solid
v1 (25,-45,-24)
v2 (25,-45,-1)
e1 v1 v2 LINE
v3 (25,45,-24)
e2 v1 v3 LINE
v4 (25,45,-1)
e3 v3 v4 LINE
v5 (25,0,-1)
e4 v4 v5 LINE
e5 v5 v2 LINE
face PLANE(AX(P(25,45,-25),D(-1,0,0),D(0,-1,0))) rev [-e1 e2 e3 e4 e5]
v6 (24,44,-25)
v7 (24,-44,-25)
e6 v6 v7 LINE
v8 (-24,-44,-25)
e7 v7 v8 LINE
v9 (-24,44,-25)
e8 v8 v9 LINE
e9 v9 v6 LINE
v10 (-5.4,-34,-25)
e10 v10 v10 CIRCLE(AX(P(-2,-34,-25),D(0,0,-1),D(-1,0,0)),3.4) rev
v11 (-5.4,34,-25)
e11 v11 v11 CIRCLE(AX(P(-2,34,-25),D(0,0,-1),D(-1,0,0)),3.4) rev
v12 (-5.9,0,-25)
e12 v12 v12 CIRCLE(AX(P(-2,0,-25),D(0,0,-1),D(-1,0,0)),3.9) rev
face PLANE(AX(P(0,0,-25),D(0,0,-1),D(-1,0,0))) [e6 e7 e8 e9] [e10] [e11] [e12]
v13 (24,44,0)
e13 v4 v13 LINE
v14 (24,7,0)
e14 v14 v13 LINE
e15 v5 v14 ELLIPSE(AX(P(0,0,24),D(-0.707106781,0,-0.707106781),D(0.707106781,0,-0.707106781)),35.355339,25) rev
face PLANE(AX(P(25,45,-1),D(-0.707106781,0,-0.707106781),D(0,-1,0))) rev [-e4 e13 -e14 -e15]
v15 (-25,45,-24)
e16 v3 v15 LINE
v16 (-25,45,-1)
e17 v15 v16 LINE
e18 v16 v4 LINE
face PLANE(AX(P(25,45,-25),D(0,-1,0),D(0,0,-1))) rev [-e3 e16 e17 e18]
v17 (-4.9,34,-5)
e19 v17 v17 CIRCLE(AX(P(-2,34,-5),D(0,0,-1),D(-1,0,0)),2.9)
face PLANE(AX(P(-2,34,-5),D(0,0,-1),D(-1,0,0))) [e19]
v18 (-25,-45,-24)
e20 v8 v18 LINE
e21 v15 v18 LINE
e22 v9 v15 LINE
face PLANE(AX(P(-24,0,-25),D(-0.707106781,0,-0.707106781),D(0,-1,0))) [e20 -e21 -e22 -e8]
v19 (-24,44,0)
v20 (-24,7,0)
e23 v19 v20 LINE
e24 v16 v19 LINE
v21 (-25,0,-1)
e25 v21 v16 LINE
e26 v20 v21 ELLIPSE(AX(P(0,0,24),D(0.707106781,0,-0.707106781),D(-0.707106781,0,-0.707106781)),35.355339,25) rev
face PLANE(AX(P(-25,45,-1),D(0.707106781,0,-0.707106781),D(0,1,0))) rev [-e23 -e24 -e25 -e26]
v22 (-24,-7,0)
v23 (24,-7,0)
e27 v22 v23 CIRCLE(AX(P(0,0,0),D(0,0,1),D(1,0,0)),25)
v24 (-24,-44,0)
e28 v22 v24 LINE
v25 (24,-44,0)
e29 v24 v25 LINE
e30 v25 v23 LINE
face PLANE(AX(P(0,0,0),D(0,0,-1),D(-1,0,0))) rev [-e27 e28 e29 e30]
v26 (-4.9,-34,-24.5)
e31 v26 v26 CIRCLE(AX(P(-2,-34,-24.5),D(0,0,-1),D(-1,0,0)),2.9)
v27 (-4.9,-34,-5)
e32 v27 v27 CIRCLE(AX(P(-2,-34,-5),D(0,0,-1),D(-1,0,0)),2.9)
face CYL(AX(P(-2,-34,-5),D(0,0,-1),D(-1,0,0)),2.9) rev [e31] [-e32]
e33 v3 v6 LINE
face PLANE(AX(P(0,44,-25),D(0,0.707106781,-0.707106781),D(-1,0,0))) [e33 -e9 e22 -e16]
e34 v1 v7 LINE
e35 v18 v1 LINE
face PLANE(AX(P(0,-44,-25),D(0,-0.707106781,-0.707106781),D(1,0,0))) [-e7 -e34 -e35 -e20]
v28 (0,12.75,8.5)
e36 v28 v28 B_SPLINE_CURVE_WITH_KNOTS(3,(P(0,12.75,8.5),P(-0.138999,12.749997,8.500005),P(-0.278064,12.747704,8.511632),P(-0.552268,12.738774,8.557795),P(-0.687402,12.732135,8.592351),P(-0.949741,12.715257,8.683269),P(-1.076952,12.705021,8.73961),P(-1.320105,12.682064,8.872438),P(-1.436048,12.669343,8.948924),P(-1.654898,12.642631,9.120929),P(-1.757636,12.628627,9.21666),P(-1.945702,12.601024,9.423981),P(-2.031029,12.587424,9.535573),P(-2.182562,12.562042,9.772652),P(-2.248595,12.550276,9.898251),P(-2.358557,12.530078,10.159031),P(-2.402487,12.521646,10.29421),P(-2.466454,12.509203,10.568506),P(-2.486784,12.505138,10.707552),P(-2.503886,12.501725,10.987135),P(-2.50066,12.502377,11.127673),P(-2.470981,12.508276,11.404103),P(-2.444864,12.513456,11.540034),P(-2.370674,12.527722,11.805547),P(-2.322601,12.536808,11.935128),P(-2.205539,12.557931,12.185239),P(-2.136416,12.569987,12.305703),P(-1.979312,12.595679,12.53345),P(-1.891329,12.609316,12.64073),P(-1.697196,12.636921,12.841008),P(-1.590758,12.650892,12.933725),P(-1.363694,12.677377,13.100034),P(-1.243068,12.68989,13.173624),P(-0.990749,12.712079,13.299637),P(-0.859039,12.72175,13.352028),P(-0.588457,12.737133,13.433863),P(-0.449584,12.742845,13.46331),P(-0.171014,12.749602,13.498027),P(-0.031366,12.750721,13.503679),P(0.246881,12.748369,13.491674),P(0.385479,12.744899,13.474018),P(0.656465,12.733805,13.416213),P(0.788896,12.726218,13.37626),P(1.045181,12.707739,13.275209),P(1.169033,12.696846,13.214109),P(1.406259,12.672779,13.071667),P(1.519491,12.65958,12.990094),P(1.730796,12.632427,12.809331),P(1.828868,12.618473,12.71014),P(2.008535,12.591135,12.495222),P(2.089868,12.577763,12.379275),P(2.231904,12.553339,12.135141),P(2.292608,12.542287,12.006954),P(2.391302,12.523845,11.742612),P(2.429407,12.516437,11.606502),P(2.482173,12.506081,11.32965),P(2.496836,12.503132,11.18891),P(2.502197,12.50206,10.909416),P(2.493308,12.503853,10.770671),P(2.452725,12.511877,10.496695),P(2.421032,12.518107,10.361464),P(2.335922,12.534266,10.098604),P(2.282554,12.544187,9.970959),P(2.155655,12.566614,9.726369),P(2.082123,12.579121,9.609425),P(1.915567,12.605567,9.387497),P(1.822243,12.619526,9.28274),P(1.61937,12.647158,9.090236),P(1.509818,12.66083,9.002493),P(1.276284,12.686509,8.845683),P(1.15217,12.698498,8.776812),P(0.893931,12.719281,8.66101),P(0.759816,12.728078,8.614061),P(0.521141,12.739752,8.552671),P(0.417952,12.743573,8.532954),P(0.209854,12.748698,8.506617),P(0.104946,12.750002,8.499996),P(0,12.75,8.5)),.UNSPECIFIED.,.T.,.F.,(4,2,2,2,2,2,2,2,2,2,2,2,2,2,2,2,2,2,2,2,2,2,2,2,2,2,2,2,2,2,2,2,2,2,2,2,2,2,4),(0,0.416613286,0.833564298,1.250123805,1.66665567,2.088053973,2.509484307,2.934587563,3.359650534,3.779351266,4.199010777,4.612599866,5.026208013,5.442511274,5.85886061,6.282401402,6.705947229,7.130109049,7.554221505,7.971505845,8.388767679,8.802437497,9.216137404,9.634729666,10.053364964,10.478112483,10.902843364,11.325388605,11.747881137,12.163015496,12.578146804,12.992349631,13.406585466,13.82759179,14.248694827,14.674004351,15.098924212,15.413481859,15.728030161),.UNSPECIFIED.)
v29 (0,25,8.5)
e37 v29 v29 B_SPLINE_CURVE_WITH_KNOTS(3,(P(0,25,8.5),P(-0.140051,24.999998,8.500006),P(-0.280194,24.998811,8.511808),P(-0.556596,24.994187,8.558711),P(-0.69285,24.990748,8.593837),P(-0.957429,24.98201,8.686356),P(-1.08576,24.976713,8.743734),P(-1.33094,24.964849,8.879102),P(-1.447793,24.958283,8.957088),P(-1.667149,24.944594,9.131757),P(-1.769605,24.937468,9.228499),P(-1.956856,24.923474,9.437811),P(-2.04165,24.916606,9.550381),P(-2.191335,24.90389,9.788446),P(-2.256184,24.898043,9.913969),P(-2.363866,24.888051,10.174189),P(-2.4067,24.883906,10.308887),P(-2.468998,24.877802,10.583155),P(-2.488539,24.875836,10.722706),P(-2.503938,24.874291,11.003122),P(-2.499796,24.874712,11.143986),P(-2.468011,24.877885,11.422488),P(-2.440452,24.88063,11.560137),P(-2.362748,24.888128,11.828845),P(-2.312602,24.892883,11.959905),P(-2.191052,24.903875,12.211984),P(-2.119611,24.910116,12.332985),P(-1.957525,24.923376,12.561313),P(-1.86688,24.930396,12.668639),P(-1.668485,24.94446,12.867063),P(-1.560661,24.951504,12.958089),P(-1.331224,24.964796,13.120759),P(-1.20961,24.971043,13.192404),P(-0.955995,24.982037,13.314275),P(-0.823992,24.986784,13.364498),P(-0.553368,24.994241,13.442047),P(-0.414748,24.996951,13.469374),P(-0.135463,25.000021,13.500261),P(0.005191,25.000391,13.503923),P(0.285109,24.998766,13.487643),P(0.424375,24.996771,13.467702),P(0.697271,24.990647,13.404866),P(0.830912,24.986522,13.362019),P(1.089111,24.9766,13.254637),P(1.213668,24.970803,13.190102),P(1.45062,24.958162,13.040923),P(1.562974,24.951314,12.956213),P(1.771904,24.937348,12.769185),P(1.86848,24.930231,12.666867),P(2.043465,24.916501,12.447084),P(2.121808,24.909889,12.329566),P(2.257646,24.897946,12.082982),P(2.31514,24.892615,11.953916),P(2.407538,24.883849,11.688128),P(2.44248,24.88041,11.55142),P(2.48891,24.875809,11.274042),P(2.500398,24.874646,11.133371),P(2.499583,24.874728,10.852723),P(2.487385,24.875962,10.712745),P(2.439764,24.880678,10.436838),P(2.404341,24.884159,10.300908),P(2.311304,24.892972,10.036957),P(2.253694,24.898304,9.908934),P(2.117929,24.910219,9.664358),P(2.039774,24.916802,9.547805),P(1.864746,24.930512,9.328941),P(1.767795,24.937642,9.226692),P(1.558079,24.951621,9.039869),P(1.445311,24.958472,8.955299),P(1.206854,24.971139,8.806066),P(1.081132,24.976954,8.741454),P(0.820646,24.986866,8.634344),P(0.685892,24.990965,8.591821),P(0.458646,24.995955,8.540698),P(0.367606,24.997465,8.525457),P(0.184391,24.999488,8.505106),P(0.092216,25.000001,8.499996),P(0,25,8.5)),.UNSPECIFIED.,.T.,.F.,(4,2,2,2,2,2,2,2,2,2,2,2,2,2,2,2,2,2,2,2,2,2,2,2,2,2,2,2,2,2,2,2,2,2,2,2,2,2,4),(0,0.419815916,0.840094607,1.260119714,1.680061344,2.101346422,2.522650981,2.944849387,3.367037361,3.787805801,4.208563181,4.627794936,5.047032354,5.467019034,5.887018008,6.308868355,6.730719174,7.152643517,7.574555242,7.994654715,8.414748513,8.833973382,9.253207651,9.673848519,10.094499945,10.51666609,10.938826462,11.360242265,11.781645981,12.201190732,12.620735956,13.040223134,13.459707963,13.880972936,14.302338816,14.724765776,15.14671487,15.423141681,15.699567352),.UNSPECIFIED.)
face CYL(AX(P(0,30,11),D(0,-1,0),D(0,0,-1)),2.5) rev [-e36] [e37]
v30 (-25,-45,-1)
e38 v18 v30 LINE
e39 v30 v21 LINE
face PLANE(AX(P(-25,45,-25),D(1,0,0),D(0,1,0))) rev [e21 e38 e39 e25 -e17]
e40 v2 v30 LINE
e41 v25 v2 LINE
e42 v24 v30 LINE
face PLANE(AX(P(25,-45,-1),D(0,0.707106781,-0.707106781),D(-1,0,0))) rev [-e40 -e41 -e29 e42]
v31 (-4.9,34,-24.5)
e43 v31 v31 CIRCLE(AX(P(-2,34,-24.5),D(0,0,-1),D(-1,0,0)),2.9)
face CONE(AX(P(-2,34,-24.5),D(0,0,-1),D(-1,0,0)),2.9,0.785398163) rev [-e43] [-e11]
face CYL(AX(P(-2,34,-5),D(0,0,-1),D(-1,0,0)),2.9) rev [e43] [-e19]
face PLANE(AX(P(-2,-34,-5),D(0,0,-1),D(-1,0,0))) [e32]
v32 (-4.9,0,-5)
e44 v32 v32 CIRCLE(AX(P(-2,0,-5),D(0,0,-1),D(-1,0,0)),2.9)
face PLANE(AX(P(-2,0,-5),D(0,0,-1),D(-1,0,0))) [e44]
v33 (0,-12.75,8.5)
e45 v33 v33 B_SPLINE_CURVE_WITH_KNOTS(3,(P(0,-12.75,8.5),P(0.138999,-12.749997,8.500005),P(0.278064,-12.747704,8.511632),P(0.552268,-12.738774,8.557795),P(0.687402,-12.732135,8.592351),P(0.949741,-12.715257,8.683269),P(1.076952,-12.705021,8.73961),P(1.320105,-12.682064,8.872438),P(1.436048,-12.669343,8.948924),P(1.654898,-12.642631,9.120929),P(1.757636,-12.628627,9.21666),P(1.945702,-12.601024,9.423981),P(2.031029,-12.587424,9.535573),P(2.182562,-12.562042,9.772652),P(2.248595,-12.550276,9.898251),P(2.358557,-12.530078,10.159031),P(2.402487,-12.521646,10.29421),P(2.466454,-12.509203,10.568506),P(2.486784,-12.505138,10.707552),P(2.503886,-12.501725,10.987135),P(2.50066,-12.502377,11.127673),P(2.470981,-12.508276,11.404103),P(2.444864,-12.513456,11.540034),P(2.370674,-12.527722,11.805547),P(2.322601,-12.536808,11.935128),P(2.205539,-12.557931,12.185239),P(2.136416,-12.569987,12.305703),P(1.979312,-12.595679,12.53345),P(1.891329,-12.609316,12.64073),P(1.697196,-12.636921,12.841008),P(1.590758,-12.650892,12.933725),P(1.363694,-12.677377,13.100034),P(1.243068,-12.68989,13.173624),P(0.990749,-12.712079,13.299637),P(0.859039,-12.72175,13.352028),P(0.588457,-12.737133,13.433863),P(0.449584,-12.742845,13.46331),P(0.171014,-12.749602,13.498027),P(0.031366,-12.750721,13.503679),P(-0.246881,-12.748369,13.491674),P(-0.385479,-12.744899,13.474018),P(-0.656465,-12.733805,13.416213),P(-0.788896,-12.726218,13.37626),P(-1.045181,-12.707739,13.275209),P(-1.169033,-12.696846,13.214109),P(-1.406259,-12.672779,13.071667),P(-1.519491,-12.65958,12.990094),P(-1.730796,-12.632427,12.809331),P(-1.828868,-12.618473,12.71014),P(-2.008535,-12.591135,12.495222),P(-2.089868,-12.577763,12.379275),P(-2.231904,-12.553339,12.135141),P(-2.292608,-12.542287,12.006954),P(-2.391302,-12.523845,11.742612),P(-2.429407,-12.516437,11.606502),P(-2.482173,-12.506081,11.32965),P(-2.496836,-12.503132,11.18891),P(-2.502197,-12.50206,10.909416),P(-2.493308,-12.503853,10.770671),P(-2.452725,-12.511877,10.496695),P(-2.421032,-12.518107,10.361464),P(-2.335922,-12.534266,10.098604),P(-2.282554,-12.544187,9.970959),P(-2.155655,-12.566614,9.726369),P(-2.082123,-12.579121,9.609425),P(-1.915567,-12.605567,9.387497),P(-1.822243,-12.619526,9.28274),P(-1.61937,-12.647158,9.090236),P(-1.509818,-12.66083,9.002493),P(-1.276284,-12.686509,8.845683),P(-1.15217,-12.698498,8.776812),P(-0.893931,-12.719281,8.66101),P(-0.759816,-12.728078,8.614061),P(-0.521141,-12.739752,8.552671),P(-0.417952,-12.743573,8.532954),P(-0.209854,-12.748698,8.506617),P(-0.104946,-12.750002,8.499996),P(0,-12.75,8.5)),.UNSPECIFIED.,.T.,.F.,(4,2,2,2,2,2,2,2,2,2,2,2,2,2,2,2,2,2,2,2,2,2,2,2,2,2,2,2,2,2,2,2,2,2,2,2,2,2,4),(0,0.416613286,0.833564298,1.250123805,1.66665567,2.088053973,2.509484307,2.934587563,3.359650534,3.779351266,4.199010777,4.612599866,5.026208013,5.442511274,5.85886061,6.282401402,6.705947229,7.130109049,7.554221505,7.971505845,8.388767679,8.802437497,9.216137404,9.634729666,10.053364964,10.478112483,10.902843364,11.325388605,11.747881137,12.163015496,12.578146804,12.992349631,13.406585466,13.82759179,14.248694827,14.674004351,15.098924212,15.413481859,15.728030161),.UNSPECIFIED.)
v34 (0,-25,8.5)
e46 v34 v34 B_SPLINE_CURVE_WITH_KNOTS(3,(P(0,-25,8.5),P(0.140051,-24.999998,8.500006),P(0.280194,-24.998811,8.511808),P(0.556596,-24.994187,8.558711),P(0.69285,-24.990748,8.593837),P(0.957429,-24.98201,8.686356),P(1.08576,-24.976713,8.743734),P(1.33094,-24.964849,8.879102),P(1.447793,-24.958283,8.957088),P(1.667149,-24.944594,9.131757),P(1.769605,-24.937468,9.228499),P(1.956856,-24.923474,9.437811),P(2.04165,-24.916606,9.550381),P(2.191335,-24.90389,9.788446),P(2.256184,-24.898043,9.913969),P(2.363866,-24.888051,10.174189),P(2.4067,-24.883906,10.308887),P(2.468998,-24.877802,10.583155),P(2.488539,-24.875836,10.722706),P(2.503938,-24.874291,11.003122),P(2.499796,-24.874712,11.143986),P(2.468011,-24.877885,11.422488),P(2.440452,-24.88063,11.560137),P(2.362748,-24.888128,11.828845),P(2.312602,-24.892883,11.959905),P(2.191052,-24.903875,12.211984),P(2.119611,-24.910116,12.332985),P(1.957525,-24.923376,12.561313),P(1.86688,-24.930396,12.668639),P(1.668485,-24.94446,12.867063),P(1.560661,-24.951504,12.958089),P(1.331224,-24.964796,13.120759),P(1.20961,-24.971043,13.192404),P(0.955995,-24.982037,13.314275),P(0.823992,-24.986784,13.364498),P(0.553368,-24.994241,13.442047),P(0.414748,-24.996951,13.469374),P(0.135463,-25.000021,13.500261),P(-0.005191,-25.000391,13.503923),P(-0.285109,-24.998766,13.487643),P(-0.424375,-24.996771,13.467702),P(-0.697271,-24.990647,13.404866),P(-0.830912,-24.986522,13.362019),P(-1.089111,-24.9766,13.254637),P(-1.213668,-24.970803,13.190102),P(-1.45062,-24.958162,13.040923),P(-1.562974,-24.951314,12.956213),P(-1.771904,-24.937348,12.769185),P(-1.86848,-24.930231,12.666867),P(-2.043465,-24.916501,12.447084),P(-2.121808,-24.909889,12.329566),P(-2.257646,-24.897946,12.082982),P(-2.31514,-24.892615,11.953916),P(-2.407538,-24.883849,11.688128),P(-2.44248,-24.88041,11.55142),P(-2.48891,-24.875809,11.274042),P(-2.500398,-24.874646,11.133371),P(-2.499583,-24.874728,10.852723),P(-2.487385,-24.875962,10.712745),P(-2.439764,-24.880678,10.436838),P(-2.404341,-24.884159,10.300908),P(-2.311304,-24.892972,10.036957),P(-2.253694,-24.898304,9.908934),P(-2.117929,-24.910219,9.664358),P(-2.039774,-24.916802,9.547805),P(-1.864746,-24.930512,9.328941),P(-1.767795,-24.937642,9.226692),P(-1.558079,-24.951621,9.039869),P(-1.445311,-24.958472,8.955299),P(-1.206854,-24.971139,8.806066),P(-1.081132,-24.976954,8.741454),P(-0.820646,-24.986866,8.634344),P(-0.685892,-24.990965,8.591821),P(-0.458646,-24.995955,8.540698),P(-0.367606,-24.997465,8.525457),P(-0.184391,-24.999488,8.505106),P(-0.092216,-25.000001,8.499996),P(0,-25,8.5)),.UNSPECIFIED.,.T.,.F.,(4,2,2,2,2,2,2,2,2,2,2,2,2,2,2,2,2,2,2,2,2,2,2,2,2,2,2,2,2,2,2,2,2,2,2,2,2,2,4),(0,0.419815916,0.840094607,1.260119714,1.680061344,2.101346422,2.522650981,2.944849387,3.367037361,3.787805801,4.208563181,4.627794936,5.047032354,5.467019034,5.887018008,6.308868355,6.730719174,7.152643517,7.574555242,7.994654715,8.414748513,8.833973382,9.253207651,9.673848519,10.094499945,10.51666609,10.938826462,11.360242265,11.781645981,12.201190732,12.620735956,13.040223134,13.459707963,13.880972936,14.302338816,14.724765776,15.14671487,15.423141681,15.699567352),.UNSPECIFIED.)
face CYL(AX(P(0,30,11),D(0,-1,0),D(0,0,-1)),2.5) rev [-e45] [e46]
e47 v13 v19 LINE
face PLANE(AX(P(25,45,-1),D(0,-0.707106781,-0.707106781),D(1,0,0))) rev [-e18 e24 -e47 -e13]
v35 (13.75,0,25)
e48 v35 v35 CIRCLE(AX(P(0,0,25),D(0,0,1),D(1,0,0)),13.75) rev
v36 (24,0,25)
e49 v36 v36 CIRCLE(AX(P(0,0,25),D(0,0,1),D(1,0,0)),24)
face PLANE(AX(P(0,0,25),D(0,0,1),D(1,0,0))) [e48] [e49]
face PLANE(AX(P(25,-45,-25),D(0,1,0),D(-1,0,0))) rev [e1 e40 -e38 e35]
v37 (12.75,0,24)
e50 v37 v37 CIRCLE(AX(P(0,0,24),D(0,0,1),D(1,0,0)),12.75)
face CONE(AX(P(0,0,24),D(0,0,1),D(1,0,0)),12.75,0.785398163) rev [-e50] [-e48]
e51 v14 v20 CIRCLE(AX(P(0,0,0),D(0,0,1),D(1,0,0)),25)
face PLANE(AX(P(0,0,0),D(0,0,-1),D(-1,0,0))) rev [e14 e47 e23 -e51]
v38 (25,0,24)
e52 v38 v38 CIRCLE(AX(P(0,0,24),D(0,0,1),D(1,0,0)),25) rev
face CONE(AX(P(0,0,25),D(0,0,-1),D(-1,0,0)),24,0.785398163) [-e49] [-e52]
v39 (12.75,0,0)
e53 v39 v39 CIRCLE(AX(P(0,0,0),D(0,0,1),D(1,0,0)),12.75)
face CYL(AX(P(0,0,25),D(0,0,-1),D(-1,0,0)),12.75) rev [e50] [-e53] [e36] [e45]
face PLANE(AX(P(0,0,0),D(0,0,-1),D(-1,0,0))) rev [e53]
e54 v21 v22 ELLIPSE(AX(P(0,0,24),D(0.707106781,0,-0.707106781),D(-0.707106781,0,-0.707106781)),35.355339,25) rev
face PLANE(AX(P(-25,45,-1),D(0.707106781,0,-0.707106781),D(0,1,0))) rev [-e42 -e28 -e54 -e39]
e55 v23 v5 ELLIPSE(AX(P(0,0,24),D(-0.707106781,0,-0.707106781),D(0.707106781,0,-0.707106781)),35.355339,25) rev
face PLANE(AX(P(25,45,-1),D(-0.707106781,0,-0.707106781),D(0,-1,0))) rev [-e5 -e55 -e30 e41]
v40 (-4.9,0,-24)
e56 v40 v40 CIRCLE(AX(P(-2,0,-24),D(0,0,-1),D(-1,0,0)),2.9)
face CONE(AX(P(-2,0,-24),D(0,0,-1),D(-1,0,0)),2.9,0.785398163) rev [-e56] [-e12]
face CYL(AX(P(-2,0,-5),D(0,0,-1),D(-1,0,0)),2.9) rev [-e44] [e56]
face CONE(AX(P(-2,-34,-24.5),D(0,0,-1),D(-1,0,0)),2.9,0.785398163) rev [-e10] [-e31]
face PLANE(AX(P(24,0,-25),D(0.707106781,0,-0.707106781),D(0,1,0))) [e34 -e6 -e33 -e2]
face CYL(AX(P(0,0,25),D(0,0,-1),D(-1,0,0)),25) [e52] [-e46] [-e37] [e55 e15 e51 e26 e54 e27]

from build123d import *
from build123d.topology import SkipClean

# Parameters (mm, degrees)
SKETCH_1_R               = 25
SKETCH_1_R_2             = 12.75
EXTRUDE_1_DEPTH          = 25
CUT_EXTRUDE_1_DEPTH      = 30
CUT_EXTRUDE_1_DEPTH_BACK = 30
SKETCH_2_R               = 2.5
SKETCH_3_W               = 50
SKETCH_3_H               = 90
EXTRUDE_2_DEPTH          = 25
CHAMFER_1_SIZE           = 1
SKETCH_4_R               = 2.9
CUT_EXTRUDE_2_DEPTH      = 20
CHAMFER_2_SIZE           = 1
SKETCH_5_R               = 2.9
CUT_EXTRUDE_3_DEPTH      = 20
CHAMFER_3_SIZE           = 0.5


with BuildPart() as part:
    # 草图1 → 凸台-拉伸1 (new body)
    with BuildSketch(Plane.XY):
        Circle(SKETCH_1_R)
        Circle(SKETCH_1_R_2, mode=Mode.SUBTRACT)
    extrude(amount=EXTRUDE_1_DEPTH)

    # 草图2 → 切除-拉伸1 (cut, two sides: drawn at the far end of the back side and taken through both)
    with BuildSketch(Plane(origin=(0, 0, 0), x_dir=(1, 0, 0), z_dir=(0, 1, 0)).offset(-CUT_EXTRUDE_1_DEPTH_BACK)):
        with Locations(Location((0, -11, 0), (0, 0, 90))):
            Circle(SKETCH_2_R)
    extrude(amount=CUT_EXTRUDE_1_DEPTH + CUT_EXTRUDE_1_DEPTH_BACK, mode=Mode.SUBTRACT)

    # 草图3 → 凸台-拉伸2 (add)
    with BuildSketch(Plane(origin=(0, 0, 0), x_dir=(-1, 0, 0), z_dir=(0, 0, -1))):
        Rectangle(SKETCH_3_W, SKETCH_3_H)
    extrude(amount=EXTRUDE_2_DEPTH)

    # 倒角1
    chamfer_1_edges = [part.edges().sort_by_distance(p)[0] for p in [
        (-25, 0, 25),
        (-12.75, 0, 25),
    ]]
    chamfer(chamfer_1_edges, length=CHAMFER_1_SIZE)

    # 草图4 → 切除-拉伸2 (cut)
    with BuildSketch(Plane(origin=(0, 0, -25), x_dir=(-1, 0, 0), z_dir=(0, 0, -1))):
        with Locations((2, 0)):
            Circle(SKETCH_4_R)
    extrude(amount=-CUT_EXTRUDE_2_DEPTH, mode=Mode.SUBTRACT)

    # 倒角2
    # the kernel refuses this chamfer: 1 mm, written as the material it takes off along each edge
    with BuildSketch(Plane(origin=(25, 0, 0), x_dir=(-0.9996219169112968, 0, 0.02749587661058639), z_dir=(0, 1, 0))) as chamfer_2_piece_1_section:
        Polygon((CHAMFER_2_SIZE * 0.999621916911, -CHAMFER_2_SIZE * 0.0274958766106), (-CHAMFER_2_SIZE * 0.0274958766106, -CHAMFER_2_SIZE * 0.999621916911), (0, 0), align=None)
    chamfer_2_piece_1 = extrude(amount=47.571682988, mode=Mode.PRIVATE)
    chamfer_2_piece_1 = chamfer_2_piece_1 - Plane(origin=(0, 0, -0.337643677), x_dir=(1, 0, 0), z_dir=(0, 0, -1)) * Cylinder(25, 100, mode=Mode.PRIVATE)
    add(chamfer_2_piece_1, mode=Mode.SUBTRACT)
    with BuildSketch(Plane(origin=(25, -47.571682988, 0), x_dir=(-0.9996219169112968, 0, 0.02749587661058639), z_dir=(0, 1, 0))) as chamfer_2_piece_2_section:
        Polygon((CHAMFER_2_SIZE * 0.999621916911, -CHAMFER_2_SIZE * 0.0274958766106), (-CHAMFER_2_SIZE * 0.0274958766106, -CHAMFER_2_SIZE * 0.999621916911), (0, 0), align=None)
    chamfer_2_piece_2 = extrude(amount=47.571682988, mode=Mode.PRIVATE)
    chamfer_2_piece_2 = chamfer_2_piece_2 - Plane(origin=(0, 0, -0.337643676), x_dir=(1, 0, 0), z_dir=(0, 0, -1)) * Cylinder(25, 100, mode=Mode.PRIVATE)
    add(chamfer_2_piece_2, mode=Mode.SUBTRACT)
    with BuildSketch(Plane(origin=(-27.571682988, -45, 0), x_dir=(0, 0.9996219169112968, 0.027495876610586292), z_dir=(1, 0, 0)), Plane(origin=(27.571682988, 45, 0), x_dir=(0, -0.9996219169112968, 0.027495876610586292), z_dir=(-1, 0, 0)), Plane(origin=(-27.571682988, -45, -25), x_dir=(0, -0.0274958766105891, 0.9996219169112968), z_dir=(1, 0, 0)), Plane(origin=(27.571682988, 45, -25), x_dir=(0, 0.0274958766105891, 0.9996219169112968), z_dir=(-1, 0, 0))) as chamfer_2_piece_3:
        Polygon((CHAMFER_2_SIZE * 0.999621916911, -CHAMFER_2_SIZE * 0.0274958766106), (-CHAMFER_2_SIZE * 0.0274958766106, -CHAMFER_2_SIZE * 0.999621916911), (0, 0), align=None)
    extrude(amount=55.143365976, mode=Mode.SUBTRACT)
    with BuildSketch(Plane(origin=(-25, -1.3e-08, 0), x_dir=(0.9996219169112968, 0, 0.02749587661058639), z_dir=(0, -1, 0))) as chamfer_2_piece_4_section:
        Polygon((CHAMFER_2_SIZE * 0.999621916911, -CHAMFER_2_SIZE * 0.0274958766106), (-CHAMFER_2_SIZE * 0.0274958766106, -CHAMFER_2_SIZE * 0.999621916911), (0, 0), align=None)
    chamfer_2_piece_4 = extrude(amount=47.571682975, mode=Mode.PRIVATE)
    chamfer_2_piece_4 = chamfer_2_piece_4 - Plane(origin=(0, 0, -0.337643677), x_dir=(1, 0, 0), z_dir=(0, 0, -1)) * Cylinder(25, 100, mode=Mode.PRIVATE)
    add(chamfer_2_piece_4, mode=Mode.SUBTRACT)
    with BuildSketch(Plane(origin=(-25, 47.571682988, 0), x_dir=(0.9996219169112968, 0, 0.02749587661058639), z_dir=(0, -1, 0))) as chamfer_2_piece_5_section:
        Polygon((CHAMFER_2_SIZE * 0.999621916911, -CHAMFER_2_SIZE * 0.0274958766106), (-CHAMFER_2_SIZE * 0.0274958766106, -CHAMFER_2_SIZE * 0.999621916911), (0, 0), align=None)
    chamfer_2_piece_5 = extrude(amount=47.571683001, mode=Mode.PRIVATE)
    chamfer_2_piece_5 = chamfer_2_piece_5 - Plane(origin=(0, 0, -0.337643677), x_dir=(1, 0, 0), z_dir=(0, 0, -1)) * Cylinder(25, 100, mode=Mode.PRIVATE)
    add(chamfer_2_piece_5, mode=Mode.SUBTRACT)
    with BuildSketch(Plane(origin=(25, -47.571682988, -25), x_dir=(0.027495876610585647, 0, 0.9996219169112968), z_dir=(0, 1, 0)), Plane(origin=(-25, 47.571682988, -25), x_dir=(-0.027495876610585647, 0, 0.9996219169112968), z_dir=(0, -1, 0))) as chamfer_2_piece_6:
        Polygon((CHAMFER_2_SIZE * 0.999621916911, -CHAMFER_2_SIZE * 0.0274958766106), (-CHAMFER_2_SIZE * 0.0274958766106, -CHAMFER_2_SIZE * 0.999621916911), (0, 0), align=None)
    extrude(amount=95.143365976, mode=Mode.SUBTRACT)
    with BuildSketch(Plane(origin=(-2, 0, -25), x_dir=(-1, 0, 0), z_dir=(0, -1, 0))) as chamfer_2_piece_7:
        Polygon((2.9 + CHAMFER_2_SIZE, 0), (2.9, -CHAMFER_2_SIZE), (2.9, 0), align=None)
    revolve(axis=Axis((-2, 0, -25), (0, 0, -1)), mode=Mode.SUBTRACT)

    # 草图5 → 切除-拉伸3 (cut)
    with SkipClean():  # the faces are left unmerged after this step: merging them gives an invalid solid
        with BuildSketch(Plane(origin=(0, 0, -25), x_dir=(-1, 0, 0), z_dir=(0, 0, -1))):
            with Locations((2, 34)):
                Circle(SKETCH_5_R)
            with Locations((2, -34)):
                Circle(SKETCH_5_R)
        extrude(amount=-CUT_EXTRUDE_3_DEPTH, mode=Mode.SUBTRACT)

    # 倒角3
    chamfer_3_edges = [part.edges().sort_by_distance(p)[0] for p in [
        (0.9, 34, -25),
        (0.9, -34, -25),
    ]]
    chamfer(chamfer_3_edges, length=CHAMFER_3_SIZE)


solid = part.part
